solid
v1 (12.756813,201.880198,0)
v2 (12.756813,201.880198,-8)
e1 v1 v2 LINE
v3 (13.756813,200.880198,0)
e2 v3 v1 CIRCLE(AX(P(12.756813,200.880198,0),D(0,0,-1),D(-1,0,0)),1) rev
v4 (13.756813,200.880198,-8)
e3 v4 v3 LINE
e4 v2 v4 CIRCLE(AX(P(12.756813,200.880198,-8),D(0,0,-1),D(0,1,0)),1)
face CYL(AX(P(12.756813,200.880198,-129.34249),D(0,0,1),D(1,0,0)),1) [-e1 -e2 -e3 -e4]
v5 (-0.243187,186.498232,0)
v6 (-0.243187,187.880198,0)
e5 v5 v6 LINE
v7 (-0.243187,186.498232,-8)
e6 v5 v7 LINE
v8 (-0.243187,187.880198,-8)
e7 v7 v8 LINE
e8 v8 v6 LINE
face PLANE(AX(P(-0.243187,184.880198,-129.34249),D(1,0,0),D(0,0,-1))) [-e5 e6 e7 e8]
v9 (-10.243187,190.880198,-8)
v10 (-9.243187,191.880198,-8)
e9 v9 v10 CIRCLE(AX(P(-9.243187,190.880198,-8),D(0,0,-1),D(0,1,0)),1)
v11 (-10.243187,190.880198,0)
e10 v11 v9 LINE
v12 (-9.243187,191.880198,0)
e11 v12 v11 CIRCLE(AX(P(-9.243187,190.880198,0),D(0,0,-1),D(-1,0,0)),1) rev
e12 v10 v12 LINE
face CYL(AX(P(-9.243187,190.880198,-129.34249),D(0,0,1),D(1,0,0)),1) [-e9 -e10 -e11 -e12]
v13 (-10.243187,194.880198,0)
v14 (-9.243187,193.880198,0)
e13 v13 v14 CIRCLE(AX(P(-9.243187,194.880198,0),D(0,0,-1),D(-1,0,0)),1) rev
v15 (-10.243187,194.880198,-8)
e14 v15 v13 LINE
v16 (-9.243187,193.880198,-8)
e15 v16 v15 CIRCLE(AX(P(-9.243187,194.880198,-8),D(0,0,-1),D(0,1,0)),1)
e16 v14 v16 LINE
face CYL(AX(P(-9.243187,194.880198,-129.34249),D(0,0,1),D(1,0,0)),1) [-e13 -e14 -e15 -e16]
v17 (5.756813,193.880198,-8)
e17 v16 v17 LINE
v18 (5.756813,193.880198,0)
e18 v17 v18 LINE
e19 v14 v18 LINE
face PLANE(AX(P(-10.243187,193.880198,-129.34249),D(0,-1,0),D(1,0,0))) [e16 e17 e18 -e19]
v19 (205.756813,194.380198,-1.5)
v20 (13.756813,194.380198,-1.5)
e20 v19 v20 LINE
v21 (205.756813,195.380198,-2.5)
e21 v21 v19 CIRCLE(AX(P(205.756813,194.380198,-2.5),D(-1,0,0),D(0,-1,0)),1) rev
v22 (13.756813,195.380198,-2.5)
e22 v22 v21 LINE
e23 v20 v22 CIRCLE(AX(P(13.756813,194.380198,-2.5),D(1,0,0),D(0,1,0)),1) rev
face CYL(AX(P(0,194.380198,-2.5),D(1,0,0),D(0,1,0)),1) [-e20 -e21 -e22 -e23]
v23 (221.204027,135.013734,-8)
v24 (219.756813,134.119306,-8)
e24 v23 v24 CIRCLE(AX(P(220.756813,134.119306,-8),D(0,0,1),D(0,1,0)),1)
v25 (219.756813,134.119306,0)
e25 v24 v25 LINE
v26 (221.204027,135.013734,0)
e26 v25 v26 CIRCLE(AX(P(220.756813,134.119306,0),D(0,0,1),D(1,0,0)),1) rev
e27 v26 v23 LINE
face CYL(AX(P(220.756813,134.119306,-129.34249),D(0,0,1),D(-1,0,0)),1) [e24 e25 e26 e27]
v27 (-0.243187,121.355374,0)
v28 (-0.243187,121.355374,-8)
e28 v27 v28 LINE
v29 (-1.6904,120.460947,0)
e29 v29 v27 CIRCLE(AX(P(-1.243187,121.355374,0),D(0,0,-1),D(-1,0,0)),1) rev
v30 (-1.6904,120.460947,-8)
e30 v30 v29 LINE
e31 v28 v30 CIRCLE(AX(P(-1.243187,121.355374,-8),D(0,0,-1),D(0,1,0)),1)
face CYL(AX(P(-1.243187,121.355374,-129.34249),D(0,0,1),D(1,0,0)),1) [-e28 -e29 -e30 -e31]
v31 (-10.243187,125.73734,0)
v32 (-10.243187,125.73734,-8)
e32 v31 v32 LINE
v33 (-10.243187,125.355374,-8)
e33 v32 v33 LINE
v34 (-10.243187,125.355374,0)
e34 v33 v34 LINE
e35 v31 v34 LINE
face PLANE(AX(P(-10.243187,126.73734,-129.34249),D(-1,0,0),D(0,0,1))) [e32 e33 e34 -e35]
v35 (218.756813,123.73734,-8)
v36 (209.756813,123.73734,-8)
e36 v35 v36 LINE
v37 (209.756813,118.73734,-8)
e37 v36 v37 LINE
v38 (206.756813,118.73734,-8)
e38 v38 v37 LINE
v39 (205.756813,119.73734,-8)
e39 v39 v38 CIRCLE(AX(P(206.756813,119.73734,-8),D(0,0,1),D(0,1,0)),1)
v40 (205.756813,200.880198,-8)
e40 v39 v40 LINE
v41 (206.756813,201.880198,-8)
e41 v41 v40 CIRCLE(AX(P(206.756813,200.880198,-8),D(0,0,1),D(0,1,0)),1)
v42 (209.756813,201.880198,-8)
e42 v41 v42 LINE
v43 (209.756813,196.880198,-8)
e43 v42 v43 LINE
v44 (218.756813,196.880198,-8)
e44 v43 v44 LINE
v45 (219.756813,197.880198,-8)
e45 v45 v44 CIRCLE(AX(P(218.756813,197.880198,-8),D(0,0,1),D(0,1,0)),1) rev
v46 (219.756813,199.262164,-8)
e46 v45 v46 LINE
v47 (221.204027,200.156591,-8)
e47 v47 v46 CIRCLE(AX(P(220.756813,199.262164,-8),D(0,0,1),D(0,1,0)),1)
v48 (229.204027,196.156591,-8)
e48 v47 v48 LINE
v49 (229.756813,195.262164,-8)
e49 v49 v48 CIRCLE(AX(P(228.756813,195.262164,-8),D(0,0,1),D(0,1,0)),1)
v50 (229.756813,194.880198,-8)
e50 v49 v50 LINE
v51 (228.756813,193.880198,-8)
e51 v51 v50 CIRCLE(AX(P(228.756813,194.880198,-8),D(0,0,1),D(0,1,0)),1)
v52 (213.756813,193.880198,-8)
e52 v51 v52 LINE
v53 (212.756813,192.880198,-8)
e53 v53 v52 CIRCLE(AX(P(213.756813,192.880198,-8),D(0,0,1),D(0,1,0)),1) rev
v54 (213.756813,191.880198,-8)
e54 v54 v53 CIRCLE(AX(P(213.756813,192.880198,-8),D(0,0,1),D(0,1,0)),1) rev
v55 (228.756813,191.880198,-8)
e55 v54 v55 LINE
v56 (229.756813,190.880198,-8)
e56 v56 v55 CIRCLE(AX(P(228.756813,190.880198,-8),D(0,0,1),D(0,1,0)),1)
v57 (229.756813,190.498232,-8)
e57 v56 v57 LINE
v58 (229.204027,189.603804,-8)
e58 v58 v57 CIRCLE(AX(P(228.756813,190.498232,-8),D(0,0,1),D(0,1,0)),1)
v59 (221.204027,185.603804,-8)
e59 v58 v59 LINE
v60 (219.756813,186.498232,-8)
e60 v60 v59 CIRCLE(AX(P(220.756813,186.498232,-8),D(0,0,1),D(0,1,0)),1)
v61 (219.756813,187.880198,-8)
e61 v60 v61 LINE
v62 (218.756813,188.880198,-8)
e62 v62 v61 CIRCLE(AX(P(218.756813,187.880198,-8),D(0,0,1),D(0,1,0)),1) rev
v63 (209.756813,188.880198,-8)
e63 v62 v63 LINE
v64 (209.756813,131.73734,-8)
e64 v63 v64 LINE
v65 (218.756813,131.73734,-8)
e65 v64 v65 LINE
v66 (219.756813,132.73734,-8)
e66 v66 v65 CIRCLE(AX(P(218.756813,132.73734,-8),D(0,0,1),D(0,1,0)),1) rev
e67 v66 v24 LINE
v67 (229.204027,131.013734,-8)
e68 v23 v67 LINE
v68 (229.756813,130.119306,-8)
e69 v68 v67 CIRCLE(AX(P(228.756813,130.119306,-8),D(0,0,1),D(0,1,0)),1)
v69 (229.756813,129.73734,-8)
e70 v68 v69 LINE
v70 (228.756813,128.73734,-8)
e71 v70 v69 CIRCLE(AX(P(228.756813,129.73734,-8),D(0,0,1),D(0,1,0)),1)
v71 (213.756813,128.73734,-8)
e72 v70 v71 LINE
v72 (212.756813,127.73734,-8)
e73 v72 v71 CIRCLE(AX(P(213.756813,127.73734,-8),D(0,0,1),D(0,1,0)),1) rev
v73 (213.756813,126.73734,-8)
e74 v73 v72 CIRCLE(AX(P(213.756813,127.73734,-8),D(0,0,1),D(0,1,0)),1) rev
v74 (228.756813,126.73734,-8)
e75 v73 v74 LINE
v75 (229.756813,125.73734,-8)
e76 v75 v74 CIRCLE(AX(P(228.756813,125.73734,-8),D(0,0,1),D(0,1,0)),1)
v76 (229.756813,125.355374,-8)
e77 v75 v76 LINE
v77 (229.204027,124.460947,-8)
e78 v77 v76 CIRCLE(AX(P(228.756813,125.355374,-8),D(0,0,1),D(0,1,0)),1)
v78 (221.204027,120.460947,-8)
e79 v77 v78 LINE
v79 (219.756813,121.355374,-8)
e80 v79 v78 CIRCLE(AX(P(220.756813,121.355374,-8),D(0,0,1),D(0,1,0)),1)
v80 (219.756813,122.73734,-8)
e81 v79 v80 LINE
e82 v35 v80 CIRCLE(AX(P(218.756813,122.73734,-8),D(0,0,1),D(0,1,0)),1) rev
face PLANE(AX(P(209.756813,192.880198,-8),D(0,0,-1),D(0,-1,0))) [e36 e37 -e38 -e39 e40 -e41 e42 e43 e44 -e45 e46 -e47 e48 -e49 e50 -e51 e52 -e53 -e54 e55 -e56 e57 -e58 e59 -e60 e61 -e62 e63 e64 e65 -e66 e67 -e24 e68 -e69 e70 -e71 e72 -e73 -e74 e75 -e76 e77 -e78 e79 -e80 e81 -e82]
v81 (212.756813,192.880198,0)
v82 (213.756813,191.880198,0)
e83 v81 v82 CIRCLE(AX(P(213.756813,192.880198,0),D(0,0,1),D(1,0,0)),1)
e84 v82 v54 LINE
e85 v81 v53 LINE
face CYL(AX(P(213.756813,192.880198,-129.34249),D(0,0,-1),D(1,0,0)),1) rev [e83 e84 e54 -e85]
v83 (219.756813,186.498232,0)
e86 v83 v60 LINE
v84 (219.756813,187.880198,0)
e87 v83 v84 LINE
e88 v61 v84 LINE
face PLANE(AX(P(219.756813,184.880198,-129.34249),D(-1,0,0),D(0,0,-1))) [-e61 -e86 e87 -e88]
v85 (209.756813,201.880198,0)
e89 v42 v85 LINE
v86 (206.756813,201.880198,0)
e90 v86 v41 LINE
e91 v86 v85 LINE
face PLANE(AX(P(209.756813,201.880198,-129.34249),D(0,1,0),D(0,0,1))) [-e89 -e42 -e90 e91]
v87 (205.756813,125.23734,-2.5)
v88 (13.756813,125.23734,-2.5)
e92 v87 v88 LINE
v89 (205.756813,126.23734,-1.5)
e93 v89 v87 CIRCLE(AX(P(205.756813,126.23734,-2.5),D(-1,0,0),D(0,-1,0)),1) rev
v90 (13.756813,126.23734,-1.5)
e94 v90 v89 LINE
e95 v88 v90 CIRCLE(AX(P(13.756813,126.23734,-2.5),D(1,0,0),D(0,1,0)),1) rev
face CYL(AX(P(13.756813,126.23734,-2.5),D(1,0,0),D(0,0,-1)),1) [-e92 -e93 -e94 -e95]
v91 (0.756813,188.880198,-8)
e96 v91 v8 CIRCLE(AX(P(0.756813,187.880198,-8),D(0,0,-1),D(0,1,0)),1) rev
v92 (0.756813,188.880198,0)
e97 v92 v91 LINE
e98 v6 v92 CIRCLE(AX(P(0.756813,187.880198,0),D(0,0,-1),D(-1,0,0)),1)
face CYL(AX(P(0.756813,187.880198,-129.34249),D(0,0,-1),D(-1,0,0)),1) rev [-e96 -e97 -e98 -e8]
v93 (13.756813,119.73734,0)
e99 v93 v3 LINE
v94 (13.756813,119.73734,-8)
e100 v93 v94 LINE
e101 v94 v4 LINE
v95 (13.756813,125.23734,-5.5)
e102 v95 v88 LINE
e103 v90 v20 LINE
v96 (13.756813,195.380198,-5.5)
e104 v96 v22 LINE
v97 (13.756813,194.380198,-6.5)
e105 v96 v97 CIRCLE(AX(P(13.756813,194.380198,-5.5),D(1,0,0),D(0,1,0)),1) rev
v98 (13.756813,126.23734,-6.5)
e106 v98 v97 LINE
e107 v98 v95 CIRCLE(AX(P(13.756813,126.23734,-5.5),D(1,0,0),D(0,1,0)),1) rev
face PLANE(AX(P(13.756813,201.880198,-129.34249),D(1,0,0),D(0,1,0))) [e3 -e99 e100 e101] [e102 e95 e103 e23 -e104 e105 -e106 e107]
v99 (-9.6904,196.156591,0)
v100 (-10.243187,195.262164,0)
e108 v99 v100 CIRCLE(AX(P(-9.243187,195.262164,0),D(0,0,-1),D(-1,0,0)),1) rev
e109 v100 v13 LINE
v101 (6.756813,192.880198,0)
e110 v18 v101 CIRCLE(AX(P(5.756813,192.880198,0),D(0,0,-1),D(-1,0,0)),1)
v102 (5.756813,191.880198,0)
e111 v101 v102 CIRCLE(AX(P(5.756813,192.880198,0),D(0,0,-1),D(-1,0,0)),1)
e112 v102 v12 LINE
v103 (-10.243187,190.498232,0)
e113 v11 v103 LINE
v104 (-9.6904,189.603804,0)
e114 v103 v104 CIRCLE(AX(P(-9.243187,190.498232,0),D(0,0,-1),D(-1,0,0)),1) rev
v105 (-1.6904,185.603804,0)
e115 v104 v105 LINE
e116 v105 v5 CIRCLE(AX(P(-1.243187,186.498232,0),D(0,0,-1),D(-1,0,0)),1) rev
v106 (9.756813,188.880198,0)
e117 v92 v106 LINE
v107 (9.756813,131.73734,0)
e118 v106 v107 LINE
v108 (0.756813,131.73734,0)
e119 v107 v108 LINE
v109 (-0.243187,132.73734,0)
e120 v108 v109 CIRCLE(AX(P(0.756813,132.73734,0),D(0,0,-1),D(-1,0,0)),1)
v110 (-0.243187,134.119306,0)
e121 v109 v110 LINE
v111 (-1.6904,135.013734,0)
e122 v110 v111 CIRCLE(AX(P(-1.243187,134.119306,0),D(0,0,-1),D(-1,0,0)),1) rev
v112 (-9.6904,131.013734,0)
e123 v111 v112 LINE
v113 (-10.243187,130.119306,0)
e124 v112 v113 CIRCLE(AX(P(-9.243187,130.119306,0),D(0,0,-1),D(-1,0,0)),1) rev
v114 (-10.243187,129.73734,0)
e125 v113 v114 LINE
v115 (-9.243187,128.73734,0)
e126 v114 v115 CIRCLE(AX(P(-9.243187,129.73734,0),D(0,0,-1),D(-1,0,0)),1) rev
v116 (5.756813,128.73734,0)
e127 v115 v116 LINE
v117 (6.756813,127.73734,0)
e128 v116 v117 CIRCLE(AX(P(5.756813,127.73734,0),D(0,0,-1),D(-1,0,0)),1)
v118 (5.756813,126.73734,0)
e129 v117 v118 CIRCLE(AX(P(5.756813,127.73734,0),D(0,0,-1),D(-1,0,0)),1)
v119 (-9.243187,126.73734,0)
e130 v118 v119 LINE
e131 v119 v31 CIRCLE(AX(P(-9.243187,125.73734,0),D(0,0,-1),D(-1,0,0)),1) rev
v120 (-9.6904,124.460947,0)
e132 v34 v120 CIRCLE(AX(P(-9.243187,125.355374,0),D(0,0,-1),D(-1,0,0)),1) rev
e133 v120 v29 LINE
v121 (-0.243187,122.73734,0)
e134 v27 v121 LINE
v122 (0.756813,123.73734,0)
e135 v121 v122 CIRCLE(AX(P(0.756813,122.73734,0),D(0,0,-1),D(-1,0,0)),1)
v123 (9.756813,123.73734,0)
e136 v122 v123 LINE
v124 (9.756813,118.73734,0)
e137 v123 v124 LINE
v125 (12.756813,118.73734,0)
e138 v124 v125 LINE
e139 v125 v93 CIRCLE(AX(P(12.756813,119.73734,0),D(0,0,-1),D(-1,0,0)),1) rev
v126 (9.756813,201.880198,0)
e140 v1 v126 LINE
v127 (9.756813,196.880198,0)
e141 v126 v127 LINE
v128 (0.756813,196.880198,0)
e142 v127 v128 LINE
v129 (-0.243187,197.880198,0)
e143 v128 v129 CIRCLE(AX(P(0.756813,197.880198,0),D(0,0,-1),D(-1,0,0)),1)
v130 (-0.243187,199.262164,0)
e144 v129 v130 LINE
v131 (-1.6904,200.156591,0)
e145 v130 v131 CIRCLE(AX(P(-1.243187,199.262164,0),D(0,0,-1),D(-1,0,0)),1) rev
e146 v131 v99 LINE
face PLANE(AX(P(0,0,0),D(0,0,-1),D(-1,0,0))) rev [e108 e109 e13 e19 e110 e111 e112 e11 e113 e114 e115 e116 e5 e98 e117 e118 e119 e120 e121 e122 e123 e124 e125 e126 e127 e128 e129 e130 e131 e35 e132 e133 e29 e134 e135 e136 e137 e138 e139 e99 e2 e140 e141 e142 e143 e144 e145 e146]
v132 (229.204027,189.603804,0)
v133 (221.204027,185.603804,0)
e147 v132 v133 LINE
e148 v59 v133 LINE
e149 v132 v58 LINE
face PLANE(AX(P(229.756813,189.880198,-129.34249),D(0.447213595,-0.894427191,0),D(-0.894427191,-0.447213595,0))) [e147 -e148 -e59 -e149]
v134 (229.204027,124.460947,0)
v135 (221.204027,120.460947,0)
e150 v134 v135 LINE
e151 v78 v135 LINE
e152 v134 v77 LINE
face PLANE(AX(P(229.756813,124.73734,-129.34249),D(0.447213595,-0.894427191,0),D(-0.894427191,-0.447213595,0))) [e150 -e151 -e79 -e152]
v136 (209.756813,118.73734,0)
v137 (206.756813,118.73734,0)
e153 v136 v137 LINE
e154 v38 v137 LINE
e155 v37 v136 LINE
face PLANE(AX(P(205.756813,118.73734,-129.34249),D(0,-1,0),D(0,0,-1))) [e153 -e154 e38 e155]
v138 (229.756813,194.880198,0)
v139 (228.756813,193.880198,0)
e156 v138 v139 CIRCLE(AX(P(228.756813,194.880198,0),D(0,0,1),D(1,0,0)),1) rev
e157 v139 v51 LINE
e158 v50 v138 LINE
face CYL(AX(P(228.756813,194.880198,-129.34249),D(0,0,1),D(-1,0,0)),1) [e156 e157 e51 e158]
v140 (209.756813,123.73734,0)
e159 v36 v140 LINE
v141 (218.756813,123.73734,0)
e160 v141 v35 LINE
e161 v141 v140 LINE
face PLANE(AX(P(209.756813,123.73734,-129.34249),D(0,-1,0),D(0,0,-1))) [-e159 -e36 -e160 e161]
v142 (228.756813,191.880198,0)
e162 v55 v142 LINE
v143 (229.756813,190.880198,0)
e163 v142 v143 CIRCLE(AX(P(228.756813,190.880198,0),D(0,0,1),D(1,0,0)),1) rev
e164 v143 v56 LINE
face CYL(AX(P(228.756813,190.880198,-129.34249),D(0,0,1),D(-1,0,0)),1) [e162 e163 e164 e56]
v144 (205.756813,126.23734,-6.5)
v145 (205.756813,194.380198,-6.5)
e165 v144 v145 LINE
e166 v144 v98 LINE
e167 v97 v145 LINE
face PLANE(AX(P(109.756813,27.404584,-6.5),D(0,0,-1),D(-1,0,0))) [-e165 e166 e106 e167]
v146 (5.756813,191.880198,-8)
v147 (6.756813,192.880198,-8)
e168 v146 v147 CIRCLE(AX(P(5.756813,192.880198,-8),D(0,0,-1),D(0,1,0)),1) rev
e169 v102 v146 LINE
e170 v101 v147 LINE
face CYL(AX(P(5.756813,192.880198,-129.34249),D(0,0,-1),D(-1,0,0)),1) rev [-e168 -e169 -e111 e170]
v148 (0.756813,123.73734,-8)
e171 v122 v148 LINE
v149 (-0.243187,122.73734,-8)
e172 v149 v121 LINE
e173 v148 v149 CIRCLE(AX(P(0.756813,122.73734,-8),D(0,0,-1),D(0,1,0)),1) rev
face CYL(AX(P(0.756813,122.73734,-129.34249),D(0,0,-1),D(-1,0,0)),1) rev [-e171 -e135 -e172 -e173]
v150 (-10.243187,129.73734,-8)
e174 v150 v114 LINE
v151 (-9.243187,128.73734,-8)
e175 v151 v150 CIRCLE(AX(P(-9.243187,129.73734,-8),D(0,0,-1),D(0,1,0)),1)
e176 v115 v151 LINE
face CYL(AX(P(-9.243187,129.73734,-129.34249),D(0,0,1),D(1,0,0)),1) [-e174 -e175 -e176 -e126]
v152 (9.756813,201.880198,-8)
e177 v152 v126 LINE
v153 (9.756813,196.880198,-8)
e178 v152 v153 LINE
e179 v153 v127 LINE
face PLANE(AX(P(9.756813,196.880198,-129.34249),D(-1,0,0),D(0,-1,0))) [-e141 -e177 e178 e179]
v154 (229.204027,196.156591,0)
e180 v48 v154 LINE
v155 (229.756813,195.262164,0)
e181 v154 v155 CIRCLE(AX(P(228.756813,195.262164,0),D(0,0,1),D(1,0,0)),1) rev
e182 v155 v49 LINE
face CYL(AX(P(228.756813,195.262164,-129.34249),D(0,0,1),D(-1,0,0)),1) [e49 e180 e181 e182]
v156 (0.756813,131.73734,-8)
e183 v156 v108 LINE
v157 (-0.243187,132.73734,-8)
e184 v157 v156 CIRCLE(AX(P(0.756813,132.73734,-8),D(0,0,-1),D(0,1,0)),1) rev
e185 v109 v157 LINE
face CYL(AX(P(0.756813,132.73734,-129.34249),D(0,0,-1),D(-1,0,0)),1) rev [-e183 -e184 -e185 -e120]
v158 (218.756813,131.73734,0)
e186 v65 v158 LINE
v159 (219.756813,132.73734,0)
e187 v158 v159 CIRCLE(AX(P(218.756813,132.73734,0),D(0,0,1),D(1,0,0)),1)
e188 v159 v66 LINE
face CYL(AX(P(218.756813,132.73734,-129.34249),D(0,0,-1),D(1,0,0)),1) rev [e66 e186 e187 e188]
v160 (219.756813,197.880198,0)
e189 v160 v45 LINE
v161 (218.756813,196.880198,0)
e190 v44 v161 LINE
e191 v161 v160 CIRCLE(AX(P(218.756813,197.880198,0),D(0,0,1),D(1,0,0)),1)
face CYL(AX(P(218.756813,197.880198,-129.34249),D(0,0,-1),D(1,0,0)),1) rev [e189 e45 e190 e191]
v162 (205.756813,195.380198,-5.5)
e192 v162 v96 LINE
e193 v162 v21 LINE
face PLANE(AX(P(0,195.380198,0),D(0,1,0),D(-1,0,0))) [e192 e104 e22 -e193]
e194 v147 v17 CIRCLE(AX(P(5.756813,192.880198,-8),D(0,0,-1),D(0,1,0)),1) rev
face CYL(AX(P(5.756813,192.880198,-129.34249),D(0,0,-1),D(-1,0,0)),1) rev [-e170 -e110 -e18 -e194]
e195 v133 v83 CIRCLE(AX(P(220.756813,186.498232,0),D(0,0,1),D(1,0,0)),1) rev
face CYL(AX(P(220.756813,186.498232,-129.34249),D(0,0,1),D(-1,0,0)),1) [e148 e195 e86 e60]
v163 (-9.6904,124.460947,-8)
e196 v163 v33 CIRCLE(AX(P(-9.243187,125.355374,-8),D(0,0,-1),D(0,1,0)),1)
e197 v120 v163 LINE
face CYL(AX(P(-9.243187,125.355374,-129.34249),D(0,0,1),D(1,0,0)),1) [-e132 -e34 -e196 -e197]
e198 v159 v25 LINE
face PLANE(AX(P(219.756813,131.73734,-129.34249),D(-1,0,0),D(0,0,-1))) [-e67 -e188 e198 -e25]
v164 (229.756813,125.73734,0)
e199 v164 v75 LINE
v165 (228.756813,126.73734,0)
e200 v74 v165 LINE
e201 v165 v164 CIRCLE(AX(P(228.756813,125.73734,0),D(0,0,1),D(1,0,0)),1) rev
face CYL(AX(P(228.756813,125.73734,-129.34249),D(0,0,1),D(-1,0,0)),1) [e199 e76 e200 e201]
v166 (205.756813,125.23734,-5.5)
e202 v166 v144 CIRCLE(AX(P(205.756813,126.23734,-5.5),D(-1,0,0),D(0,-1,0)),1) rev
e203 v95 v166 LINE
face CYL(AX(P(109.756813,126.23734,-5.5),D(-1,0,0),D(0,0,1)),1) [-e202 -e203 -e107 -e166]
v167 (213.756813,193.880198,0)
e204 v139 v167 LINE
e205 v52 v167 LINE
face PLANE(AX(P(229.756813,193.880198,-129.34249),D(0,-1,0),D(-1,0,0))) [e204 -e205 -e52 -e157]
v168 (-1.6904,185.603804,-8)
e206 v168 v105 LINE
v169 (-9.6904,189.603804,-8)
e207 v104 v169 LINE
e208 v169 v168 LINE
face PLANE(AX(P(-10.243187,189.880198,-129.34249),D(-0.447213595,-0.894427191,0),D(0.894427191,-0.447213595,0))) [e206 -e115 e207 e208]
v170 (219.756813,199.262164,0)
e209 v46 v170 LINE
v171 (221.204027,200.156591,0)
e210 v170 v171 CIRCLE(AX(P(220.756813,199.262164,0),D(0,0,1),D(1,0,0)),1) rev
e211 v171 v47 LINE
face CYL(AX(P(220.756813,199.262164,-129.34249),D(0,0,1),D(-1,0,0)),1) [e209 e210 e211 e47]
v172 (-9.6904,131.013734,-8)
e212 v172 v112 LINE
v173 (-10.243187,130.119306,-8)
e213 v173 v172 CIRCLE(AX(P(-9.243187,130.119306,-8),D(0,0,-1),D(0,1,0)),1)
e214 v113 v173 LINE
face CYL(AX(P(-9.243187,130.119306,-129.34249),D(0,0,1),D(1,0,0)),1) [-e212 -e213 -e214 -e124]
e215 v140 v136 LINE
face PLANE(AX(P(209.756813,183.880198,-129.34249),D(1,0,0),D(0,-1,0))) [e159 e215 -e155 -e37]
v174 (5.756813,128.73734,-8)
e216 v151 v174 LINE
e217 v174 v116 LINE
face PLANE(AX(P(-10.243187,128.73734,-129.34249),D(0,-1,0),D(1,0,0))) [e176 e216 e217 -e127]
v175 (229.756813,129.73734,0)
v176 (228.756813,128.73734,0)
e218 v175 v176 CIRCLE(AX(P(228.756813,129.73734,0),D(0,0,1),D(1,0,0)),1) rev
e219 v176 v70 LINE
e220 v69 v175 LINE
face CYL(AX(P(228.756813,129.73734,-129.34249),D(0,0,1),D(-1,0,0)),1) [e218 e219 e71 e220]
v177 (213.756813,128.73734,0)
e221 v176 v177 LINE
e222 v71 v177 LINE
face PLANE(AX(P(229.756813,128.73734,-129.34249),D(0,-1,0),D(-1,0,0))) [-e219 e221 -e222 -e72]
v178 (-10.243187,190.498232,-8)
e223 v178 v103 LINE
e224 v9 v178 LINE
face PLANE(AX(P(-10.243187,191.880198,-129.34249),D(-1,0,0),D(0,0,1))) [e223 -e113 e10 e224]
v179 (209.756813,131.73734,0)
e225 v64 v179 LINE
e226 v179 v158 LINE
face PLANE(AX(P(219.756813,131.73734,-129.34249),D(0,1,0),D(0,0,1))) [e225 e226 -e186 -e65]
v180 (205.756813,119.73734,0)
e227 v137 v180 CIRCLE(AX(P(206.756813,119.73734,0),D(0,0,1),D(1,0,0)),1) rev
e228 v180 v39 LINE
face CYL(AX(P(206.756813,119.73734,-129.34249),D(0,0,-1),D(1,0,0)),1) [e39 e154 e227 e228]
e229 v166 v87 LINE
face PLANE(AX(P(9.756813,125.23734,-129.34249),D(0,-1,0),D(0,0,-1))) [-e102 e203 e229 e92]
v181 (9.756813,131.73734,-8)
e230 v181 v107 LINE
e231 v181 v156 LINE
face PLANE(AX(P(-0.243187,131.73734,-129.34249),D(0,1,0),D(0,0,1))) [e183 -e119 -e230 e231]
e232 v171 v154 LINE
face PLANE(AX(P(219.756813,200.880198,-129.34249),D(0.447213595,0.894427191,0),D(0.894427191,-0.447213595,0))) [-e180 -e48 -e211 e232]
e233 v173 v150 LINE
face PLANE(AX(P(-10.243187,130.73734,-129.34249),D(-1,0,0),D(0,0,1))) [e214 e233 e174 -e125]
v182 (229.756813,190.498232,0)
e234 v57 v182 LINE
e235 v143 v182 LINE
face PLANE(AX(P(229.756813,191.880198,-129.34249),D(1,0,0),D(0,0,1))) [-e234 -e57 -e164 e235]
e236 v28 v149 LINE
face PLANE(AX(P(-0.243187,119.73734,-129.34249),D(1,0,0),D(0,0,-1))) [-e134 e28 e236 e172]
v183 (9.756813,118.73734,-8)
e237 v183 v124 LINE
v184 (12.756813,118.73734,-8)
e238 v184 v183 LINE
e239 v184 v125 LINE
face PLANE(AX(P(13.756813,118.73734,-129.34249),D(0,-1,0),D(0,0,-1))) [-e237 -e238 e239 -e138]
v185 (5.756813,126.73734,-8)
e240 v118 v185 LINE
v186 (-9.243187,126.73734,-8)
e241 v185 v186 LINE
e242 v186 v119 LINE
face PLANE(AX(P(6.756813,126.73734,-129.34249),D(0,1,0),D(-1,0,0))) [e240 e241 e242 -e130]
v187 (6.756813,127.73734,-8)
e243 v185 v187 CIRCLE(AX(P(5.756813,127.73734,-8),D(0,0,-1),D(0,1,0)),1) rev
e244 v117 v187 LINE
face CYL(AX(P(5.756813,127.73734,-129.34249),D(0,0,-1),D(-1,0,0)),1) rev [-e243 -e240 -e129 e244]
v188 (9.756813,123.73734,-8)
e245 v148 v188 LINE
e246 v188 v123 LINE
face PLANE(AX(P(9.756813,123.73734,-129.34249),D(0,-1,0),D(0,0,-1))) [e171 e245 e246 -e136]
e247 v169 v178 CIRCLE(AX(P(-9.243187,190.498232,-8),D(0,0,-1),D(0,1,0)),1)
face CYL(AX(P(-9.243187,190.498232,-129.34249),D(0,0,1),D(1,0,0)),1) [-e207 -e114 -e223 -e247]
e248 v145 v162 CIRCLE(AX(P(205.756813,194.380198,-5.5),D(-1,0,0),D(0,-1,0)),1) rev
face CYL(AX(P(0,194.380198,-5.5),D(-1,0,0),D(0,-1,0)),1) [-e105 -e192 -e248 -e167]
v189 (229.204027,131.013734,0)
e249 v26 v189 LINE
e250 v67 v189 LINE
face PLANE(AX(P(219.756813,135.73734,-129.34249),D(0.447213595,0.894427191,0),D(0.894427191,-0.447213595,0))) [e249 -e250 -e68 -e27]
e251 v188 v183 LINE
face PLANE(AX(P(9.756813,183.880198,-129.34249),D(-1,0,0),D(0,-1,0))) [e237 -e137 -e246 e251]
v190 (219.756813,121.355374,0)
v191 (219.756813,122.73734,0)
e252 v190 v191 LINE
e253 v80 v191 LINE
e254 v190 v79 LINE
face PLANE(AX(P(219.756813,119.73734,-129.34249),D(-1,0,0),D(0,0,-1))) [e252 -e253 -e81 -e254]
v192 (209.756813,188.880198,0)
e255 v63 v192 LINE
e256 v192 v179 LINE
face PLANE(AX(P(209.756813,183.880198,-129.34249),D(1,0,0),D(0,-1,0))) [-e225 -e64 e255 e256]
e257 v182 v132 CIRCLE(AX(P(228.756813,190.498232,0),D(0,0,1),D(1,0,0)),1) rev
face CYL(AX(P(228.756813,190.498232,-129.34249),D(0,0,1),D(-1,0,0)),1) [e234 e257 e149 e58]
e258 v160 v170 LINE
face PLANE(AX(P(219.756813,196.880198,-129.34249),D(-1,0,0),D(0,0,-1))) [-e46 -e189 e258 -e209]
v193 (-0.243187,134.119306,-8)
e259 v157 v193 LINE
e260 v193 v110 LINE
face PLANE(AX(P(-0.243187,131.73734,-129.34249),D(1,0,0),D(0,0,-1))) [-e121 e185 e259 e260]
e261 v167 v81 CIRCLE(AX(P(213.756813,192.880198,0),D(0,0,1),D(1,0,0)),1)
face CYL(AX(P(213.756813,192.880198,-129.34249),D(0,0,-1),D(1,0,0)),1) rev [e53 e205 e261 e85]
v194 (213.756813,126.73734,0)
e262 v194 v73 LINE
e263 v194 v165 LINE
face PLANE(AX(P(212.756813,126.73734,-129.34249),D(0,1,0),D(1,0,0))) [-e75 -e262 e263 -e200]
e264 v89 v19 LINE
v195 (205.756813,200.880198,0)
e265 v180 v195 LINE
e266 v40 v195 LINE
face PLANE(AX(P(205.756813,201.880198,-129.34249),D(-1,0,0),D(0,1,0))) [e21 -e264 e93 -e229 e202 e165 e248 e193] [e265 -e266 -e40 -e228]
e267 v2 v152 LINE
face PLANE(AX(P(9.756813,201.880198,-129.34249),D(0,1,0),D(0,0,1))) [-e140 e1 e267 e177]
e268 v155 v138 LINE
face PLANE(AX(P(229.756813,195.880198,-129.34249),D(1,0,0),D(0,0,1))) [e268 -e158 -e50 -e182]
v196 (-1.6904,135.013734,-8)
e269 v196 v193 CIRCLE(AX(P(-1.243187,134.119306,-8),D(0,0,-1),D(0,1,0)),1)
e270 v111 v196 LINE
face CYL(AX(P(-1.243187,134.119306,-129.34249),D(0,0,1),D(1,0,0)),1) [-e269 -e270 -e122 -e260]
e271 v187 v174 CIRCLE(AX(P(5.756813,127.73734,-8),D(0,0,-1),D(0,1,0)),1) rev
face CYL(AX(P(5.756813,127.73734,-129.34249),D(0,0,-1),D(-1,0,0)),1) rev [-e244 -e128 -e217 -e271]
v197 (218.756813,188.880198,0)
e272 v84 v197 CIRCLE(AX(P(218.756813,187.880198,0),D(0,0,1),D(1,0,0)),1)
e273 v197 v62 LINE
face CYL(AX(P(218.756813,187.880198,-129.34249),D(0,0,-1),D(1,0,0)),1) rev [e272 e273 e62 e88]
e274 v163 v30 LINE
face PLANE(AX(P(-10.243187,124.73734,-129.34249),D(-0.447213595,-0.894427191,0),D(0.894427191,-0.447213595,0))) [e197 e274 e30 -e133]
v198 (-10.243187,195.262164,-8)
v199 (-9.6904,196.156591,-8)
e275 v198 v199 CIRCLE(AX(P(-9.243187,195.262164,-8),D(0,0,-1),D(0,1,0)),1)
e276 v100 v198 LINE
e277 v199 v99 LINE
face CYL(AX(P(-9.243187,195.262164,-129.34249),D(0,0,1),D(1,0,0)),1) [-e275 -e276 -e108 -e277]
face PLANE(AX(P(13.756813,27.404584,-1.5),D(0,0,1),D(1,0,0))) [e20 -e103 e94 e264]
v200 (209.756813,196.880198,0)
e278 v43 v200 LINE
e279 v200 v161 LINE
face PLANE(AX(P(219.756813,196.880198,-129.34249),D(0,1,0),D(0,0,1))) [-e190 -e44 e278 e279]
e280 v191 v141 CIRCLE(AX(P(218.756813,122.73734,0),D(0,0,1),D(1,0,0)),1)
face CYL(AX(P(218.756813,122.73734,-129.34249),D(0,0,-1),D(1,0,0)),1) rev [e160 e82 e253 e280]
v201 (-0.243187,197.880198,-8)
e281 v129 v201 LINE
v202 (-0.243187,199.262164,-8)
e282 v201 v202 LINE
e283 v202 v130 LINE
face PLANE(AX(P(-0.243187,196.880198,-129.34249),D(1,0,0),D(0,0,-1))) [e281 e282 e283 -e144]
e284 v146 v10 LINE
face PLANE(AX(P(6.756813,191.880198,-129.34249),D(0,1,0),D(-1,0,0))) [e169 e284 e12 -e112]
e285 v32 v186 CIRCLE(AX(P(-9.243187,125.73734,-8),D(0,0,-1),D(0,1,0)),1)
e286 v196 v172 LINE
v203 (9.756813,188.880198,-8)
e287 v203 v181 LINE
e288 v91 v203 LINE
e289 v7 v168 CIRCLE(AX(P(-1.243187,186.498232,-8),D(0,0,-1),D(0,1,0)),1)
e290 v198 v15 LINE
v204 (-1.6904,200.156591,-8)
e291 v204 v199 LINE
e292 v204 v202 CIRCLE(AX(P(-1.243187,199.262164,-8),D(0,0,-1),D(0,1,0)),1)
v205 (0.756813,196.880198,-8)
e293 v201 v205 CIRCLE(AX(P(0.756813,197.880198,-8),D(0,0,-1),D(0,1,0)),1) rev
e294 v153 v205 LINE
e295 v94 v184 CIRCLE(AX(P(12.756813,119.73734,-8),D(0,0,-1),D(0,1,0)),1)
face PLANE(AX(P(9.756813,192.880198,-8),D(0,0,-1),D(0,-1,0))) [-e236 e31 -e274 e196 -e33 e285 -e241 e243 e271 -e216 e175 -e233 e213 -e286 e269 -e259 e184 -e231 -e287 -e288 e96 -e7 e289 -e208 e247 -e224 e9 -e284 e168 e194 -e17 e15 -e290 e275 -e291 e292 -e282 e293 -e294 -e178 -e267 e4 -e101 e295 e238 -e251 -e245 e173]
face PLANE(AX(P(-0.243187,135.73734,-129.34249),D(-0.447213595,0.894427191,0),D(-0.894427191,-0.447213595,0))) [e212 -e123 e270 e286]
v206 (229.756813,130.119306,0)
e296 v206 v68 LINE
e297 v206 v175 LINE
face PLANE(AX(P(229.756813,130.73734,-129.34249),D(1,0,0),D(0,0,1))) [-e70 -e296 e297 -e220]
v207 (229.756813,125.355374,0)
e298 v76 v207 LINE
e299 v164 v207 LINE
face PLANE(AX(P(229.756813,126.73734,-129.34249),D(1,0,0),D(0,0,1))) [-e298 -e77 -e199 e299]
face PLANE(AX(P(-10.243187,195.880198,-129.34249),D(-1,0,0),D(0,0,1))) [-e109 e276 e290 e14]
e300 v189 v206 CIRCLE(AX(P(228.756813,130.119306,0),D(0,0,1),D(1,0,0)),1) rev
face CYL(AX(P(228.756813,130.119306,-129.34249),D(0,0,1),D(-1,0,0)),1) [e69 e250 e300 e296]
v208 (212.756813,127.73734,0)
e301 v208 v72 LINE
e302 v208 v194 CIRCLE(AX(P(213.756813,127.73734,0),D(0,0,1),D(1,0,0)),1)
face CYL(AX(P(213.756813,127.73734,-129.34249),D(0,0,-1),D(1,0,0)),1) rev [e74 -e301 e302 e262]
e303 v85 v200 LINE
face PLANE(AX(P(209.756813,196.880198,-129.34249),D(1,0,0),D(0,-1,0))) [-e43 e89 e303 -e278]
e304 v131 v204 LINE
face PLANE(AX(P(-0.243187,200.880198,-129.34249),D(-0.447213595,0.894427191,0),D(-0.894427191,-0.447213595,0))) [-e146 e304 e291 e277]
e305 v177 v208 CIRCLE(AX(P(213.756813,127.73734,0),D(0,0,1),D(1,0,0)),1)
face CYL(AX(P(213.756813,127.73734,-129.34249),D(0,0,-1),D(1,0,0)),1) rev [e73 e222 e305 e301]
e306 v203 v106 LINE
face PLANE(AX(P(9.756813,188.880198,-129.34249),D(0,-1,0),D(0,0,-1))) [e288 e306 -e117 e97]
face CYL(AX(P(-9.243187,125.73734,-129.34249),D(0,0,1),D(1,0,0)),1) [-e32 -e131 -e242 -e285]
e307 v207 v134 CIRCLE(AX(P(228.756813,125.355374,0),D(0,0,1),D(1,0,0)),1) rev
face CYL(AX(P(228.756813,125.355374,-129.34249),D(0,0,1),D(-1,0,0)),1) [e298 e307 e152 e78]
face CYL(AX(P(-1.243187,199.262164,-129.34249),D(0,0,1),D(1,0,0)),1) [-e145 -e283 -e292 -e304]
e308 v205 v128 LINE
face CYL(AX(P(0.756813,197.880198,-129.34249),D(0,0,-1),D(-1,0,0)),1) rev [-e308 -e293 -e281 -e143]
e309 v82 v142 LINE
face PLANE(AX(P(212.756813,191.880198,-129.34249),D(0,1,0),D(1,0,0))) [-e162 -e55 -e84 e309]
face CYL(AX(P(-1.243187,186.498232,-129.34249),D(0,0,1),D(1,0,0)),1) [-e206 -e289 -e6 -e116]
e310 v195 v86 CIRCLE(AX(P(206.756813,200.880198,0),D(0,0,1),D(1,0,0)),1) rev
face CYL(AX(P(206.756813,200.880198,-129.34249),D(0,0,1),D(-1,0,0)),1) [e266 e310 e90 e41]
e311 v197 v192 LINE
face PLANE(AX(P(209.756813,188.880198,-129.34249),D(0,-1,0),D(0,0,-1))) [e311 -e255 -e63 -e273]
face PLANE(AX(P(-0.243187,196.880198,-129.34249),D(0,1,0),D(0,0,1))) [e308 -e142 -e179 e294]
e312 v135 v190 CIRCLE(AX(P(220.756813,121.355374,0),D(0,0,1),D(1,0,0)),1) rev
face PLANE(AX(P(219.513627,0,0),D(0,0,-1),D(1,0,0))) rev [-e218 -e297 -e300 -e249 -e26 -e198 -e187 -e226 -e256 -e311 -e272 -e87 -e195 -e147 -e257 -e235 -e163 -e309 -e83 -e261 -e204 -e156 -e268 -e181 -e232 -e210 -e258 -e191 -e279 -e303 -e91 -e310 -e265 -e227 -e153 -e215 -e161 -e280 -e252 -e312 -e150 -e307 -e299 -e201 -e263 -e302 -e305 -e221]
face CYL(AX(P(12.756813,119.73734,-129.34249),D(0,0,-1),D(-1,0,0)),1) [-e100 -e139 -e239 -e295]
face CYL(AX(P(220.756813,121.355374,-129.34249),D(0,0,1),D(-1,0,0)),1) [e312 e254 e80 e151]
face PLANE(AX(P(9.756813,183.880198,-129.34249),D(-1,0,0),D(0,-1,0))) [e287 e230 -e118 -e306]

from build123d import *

# Parameters (mm, degrees)
BOSS_EXTRUDE1_DEPTH    = 8
FILLET2_R              = 1
FILLET3_R              = 1
SPLIT1_SURFACE_1_BACK  = 122.606
SPLIT1_SURFACE_1_DEPTH = 245.212
SPLIT1_SURFACE_2_BACK  = 122.606
SPLIT1_SURFACE_2_DEPTH = 245.212
LPATTERN1_START        = -8
LPATTERN1_DEPTH        = 8
SKETCH5_W              = 96
SKETCH5_H              = 8
BOSS_EXTRUDE4_DEPTH    = 73.142857143
MOVE_START             = 123.737340417
MOVE_FACE1_OUTLINE_W   = 96
MOVE_FACE1_OUTLINE_H   = 1.5
MOVE_FACE1_DEPTH       = 73.142857142
MOVE_FACE1_2_OUTLINE_W = 96
MOVE_FACE1_2_OUTLINE_H = 5
MOVE_FACE1_2_DEPTH     = 1.5
MOVE_START_2           = 195.380197559
MOVE_FACE1_3_OUTLINE_W = 96
MOVE_FACE1_3_OUTLINE_H = 5
MOVE_FACE1_3_DEPTH     = 1.5
SKETCH6_W              = 4
SKETCH6_H              = 8
BOSS_EXTRUDE3_DEPTH    = 83.142857143
FILLET4_R              = 1
FILLET5_R              = 1


# Read off the part's stored shape, not the designer's step: LPattern1, Move Face1
with BuildPart() as part:
    # Sketch1 (on Front Plane) → Boss-Extrude1 (new body)
    with BuildSketch(Plane.XY):
        Polygon((13.756813274, 188.880197559), (109.756813274, 188.880197559), (109.756813274, 196.880197559), (13.756813274, 196.880197559), (13.756813274, 201.880197559), (9.756813274, 201.880197559), (9.756813274, 196.880197559), (-0.243186726, 196.880197559), (-0.243186726, 200.880197559), (-10.243186726, 195.880197559), (-10.243186726, 193.880197559), (6.756813274, 193.880197559), (6.756813274, 191.880197559), (-10.243186726, 191.880197559), (-10.243186726, 189.880197559), (-0.243186726, 184.880197559), (-0.243186726, 188.880197559), (9.756813274, 188.880197559), (9.756813274, 183.880197559), (13.756813274, 183.880197559), align=None)
    extrude(amount=-BOSS_EXTRUDE1_DEPTH)

    # Fillet2
    fillet2_edges = [part.edges().sort_by_distance(p)[0] for p in [
        (6.756813274, 191.880197559, -4),
        (6.756813274, 193.880197559, -4),
    ]]
    fillet(fillet2_edges, radius=FILLET2_R - 0.0001)  # a hair under: the kernel refuses the full size

    # Fillet3
    fillet3_edges = [part.edges().sort_by_distance(p)[0] for p in [
        (-0.243186726, 196.880197559, -4),
        (-0.243186726, 200.880197559, -4),
        (-10.243186726, 195.880197559, -4),
        (-10.243186726, 193.880197559, -4),
        (-10.243186726, 191.880197559, -4),
        (-10.243186726, 189.880197559, -4),
        (-0.243186726, 184.880197559, -4),
        (-0.243186726, 188.880197559, -4),
    ]]
    fillet(fillet3_edges, radius=FILLET3_R)


with BuildPart() as body_2:
    # Split1: the piece behind the surface
    add(part.part)
    # Split1 surface: a surface, the sketch's curves swept straight by 245.212 mm
    with BuildLine(Plane.XY.offset(-SPLIT1_SURFACE_1_BACK), mode=Mode.PRIVATE) as split1_surface_1_path:
        Line((13.756813274, 196.880197559), (13.756813274, 188.880197559))
    split1_surface_1 = Shell.extrude(split1_surface_1_path.wire(), (0 * SPLIT1_SURFACE_1_DEPTH, 0 * SPLIT1_SURFACE_1_DEPTH, 1 * SPLIT1_SURFACE_1_DEPTH))
    split(bisect_by=split1_surface_1, keep=Keep.BOTTOM)



with BuildPart() as part_1:
    add(part.part)

    # Split1: split by a surface, the side it looks to stays
    # Split1 surface: a surface, the sketch's curves swept straight by 245.212 mm
    with BuildLine(Plane.XY.offset(-SPLIT1_SURFACE_2_BACK), mode=Mode.PRIVATE) as split1_surface_2_path:
        Line((13.756813274, 196.880197559), (13.756813274, 188.880197559))
    split1_surface_2 = Shell.extrude(split1_surface_2_path.wire(), (0 * SPLIT1_SURFACE_2_DEPTH, 0 * SPLIT1_SURFACE_2_DEPTH, 1 * SPLIT1_SURFACE_2_DEPTH))
    split(bisect_by=split1_surface_2, keep=Keep.TOP)


with BuildPart() as body_3:
    # LPattern1 outline → LPattern1 (new body)
    with BuildSketch(Plane.XY.offset(LPATTERN1_START)):
        with BuildLine():
            Line((0.756813274, 123.737340417), (9.756813274, 123.737340417))
            Line((9.756813274, 123.737340417), (9.756813274, 118.737340417))
            Line((9.756813274, 118.737340417), (13.756813274, 118.737340417))
            Line((13.756813274, 118.737340417), (13.756813274, 136.737340417))
            Line((13.756813274, 136.737340417), (9.756813274, 136.737340417))
            Line((9.756813274, 136.737340417), (9.756813274, 131.737340417))
            Line((9.756813274, 131.737340417), (0.756813274, 131.737340417))
            ThreePointArc((0.756813274, 131.737340417), (0.049706492, 132.030233635), (-0.243186726, 132.737340417))
            Line((-0.243186726, 132.737340417), (-0.243186726, 134.119306428))
            ThreePointArc((-0.243186726, 134.119306428), (-0.717455614, 134.969957236), (-1.690400321, 135.013733619))
            Line((-1.690400321, 135.013733619), (-9.690400321, 131.013733619))
            ThreePointArc((-9.690400321, 131.013733619), (-10.093837534, 130.64503754), (-10.243186726, 130.119306428))
            Line((-10.243186726, 130.119306428), (-10.243186726, 129.737340417))
            ThreePointArc((-10.243186726, 129.737340417), (-9.950293508, 129.030233635), (-9.243186726, 128.737340417))
            Line((-9.243186726, 128.737340417), (5.756813274, 128.737340417))
            ThreePointArc((5.756813274, 128.737340417), (6.463920055, 128.444447198), (6.756813274, 127.737340417))
            ThreePointArc((6.756813274, 127.737340417), (6.463920055, 127.030233635), (5.756813274, 126.737340417))
            Line((5.756813274, 126.737340417), (-9.243186726, 126.737340417))
            ThreePointArc((-9.243186726, 126.737340417), (-9.950293507, 126.444447198), (-10.243186726, 125.737340417))
            Line((-10.243186726, 125.737340417), (-10.243186726, 125.355374405))
            ThreePointArc((-10.243186726, 125.355374405), (-10.093837534, 124.829643293), (-9.690400321, 124.460947214))
            Line((-9.690400321, 124.460947214), (-1.690400321, 120.460947214))
            ThreePointArc((-1.690400321, 120.460947214), (-0.717455614, 120.504723597), (-0.243186726, 121.355374405))
            Line((-0.243186726, 121.355374405), (-0.243186726, 122.737340417))
            ThreePointArc((-0.243186726, 122.737340417), (0.049706493, 123.444447198), (0.756813274, 123.737340417))
        make_face()
    extrude(amount=LPATTERN1_DEPTH)


with BuildPart() as body_4:
    # Sketch5 → Boss-Extrude4 (new body)
    with BuildSketch(Plane(origin=(0, 196.880197559, 0), x_dir=(1, 0, 0), z_dir=(0, 1, 0))):
        with Locations((61.756813274, 4)):
            Rectangle(SKETCH5_W, SKETCH5_H)
    extrude(amount=-BOSS_EXTRUDE4_DEPTH)

    # Move Face1 outline → Move Face1 (cut)
    with BuildSketch(Plane(origin=(0, 0, 0), x_dir=(1, 0, 0), z_dir=(0, 1, 0)).offset(MOVE_START)):
        with Locations((61.756813274, 7.25)):
            Rectangle(MOVE_FACE1_OUTLINE_W, MOVE_FACE1_OUTLINE_H)
        with Locations((61.756813274, 0.75)):
            Rectangle(MOVE_FACE1_OUTLINE_W, MOVE_FACE1_OUTLINE_H)
    extrude(amount=MOVE_FACE1_DEPTH, mode=Mode.SUBTRACT)

    # Move Face1 2 outline → Move Face1 2 (cut)
    with BuildSketch(Plane(origin=(0, 0, 0), x_dir=(1, 0, 0), z_dir=(0, 1, 0)).offset(MOVE_START)):
        with Locations((61.756813274, 4)):
            Rectangle(MOVE_FACE1_2_OUTLINE_W, MOVE_FACE1_2_OUTLINE_H)
    extrude(amount=MOVE_FACE1_2_DEPTH, mode=Mode.SUBTRACT)

    # Move Face1 3 outline → Move Face1 3 (cut)
    with BuildSketch(Plane(origin=(0, 0, 0), x_dir=(1, 0, 0), z_dir=(0, 1, 0)).offset(MOVE_START_2)):
        with Locations((61.756813274, 4)):
            Rectangle(MOVE_FACE1_3_OUTLINE_W, MOVE_FACE1_3_OUTLINE_H)
    extrude(amount=MOVE_FACE1_3_DEPTH, mode=Mode.SUBTRACT)


with BuildPart() as body_2_1:
    add(body_2.part)

    add(body_3.part)  # Boss-Extrude3 merges body 3

    add(body_4.part)  # Boss-Extrude3 merges body 4
    # Sketch6 → Boss-Extrude3 (add)
    with BuildSketch(Plane(origin=(0, 201.880197559, 0), x_dir=(1, 0, 0), z_dir=(0, 1, 0))):
        with Locations((11.756813274, 4)):
            Rectangle(SKETCH6_W, SKETCH6_H)
    extrude(amount=-BOSS_EXTRUDE3_DEPTH)

    # Fillet4
    fillet4_edges = [body_2_1.edges().sort_by_distance(p)[0] for p in [
        (13.756813274, 118.737340417, -4),
        (13.756813274, 201.880197559, -4),
    ]]
    fillet(fillet4_edges, radius=FILLET4_R)

    # Mirror1: body 2 across plane


with BuildPart() as body_2_2:
    add(body_2_1.part)
    add(body_2_1.part.mirror(Plane(origin=(109.756813274, 27.404583786, 0), x_dir=(0, 0, 1), z_dir=(1, 0, 0))))

    # Fillet5
    fillet5_edges = [body_2_2.edges().sort_by_distance(p)[0] for p in [
        (109.756813274, 195.380197559, -1.5),
        (109.756813274, 195.380197559, -6.5),
        (109.756813274, 125.237340417, -6.5),
        (109.756813274, 125.237340417, -1.5),
    ]]
    fillet(fillet5_edges, radius=FILLET5_R)


solid = body_2_2.part
